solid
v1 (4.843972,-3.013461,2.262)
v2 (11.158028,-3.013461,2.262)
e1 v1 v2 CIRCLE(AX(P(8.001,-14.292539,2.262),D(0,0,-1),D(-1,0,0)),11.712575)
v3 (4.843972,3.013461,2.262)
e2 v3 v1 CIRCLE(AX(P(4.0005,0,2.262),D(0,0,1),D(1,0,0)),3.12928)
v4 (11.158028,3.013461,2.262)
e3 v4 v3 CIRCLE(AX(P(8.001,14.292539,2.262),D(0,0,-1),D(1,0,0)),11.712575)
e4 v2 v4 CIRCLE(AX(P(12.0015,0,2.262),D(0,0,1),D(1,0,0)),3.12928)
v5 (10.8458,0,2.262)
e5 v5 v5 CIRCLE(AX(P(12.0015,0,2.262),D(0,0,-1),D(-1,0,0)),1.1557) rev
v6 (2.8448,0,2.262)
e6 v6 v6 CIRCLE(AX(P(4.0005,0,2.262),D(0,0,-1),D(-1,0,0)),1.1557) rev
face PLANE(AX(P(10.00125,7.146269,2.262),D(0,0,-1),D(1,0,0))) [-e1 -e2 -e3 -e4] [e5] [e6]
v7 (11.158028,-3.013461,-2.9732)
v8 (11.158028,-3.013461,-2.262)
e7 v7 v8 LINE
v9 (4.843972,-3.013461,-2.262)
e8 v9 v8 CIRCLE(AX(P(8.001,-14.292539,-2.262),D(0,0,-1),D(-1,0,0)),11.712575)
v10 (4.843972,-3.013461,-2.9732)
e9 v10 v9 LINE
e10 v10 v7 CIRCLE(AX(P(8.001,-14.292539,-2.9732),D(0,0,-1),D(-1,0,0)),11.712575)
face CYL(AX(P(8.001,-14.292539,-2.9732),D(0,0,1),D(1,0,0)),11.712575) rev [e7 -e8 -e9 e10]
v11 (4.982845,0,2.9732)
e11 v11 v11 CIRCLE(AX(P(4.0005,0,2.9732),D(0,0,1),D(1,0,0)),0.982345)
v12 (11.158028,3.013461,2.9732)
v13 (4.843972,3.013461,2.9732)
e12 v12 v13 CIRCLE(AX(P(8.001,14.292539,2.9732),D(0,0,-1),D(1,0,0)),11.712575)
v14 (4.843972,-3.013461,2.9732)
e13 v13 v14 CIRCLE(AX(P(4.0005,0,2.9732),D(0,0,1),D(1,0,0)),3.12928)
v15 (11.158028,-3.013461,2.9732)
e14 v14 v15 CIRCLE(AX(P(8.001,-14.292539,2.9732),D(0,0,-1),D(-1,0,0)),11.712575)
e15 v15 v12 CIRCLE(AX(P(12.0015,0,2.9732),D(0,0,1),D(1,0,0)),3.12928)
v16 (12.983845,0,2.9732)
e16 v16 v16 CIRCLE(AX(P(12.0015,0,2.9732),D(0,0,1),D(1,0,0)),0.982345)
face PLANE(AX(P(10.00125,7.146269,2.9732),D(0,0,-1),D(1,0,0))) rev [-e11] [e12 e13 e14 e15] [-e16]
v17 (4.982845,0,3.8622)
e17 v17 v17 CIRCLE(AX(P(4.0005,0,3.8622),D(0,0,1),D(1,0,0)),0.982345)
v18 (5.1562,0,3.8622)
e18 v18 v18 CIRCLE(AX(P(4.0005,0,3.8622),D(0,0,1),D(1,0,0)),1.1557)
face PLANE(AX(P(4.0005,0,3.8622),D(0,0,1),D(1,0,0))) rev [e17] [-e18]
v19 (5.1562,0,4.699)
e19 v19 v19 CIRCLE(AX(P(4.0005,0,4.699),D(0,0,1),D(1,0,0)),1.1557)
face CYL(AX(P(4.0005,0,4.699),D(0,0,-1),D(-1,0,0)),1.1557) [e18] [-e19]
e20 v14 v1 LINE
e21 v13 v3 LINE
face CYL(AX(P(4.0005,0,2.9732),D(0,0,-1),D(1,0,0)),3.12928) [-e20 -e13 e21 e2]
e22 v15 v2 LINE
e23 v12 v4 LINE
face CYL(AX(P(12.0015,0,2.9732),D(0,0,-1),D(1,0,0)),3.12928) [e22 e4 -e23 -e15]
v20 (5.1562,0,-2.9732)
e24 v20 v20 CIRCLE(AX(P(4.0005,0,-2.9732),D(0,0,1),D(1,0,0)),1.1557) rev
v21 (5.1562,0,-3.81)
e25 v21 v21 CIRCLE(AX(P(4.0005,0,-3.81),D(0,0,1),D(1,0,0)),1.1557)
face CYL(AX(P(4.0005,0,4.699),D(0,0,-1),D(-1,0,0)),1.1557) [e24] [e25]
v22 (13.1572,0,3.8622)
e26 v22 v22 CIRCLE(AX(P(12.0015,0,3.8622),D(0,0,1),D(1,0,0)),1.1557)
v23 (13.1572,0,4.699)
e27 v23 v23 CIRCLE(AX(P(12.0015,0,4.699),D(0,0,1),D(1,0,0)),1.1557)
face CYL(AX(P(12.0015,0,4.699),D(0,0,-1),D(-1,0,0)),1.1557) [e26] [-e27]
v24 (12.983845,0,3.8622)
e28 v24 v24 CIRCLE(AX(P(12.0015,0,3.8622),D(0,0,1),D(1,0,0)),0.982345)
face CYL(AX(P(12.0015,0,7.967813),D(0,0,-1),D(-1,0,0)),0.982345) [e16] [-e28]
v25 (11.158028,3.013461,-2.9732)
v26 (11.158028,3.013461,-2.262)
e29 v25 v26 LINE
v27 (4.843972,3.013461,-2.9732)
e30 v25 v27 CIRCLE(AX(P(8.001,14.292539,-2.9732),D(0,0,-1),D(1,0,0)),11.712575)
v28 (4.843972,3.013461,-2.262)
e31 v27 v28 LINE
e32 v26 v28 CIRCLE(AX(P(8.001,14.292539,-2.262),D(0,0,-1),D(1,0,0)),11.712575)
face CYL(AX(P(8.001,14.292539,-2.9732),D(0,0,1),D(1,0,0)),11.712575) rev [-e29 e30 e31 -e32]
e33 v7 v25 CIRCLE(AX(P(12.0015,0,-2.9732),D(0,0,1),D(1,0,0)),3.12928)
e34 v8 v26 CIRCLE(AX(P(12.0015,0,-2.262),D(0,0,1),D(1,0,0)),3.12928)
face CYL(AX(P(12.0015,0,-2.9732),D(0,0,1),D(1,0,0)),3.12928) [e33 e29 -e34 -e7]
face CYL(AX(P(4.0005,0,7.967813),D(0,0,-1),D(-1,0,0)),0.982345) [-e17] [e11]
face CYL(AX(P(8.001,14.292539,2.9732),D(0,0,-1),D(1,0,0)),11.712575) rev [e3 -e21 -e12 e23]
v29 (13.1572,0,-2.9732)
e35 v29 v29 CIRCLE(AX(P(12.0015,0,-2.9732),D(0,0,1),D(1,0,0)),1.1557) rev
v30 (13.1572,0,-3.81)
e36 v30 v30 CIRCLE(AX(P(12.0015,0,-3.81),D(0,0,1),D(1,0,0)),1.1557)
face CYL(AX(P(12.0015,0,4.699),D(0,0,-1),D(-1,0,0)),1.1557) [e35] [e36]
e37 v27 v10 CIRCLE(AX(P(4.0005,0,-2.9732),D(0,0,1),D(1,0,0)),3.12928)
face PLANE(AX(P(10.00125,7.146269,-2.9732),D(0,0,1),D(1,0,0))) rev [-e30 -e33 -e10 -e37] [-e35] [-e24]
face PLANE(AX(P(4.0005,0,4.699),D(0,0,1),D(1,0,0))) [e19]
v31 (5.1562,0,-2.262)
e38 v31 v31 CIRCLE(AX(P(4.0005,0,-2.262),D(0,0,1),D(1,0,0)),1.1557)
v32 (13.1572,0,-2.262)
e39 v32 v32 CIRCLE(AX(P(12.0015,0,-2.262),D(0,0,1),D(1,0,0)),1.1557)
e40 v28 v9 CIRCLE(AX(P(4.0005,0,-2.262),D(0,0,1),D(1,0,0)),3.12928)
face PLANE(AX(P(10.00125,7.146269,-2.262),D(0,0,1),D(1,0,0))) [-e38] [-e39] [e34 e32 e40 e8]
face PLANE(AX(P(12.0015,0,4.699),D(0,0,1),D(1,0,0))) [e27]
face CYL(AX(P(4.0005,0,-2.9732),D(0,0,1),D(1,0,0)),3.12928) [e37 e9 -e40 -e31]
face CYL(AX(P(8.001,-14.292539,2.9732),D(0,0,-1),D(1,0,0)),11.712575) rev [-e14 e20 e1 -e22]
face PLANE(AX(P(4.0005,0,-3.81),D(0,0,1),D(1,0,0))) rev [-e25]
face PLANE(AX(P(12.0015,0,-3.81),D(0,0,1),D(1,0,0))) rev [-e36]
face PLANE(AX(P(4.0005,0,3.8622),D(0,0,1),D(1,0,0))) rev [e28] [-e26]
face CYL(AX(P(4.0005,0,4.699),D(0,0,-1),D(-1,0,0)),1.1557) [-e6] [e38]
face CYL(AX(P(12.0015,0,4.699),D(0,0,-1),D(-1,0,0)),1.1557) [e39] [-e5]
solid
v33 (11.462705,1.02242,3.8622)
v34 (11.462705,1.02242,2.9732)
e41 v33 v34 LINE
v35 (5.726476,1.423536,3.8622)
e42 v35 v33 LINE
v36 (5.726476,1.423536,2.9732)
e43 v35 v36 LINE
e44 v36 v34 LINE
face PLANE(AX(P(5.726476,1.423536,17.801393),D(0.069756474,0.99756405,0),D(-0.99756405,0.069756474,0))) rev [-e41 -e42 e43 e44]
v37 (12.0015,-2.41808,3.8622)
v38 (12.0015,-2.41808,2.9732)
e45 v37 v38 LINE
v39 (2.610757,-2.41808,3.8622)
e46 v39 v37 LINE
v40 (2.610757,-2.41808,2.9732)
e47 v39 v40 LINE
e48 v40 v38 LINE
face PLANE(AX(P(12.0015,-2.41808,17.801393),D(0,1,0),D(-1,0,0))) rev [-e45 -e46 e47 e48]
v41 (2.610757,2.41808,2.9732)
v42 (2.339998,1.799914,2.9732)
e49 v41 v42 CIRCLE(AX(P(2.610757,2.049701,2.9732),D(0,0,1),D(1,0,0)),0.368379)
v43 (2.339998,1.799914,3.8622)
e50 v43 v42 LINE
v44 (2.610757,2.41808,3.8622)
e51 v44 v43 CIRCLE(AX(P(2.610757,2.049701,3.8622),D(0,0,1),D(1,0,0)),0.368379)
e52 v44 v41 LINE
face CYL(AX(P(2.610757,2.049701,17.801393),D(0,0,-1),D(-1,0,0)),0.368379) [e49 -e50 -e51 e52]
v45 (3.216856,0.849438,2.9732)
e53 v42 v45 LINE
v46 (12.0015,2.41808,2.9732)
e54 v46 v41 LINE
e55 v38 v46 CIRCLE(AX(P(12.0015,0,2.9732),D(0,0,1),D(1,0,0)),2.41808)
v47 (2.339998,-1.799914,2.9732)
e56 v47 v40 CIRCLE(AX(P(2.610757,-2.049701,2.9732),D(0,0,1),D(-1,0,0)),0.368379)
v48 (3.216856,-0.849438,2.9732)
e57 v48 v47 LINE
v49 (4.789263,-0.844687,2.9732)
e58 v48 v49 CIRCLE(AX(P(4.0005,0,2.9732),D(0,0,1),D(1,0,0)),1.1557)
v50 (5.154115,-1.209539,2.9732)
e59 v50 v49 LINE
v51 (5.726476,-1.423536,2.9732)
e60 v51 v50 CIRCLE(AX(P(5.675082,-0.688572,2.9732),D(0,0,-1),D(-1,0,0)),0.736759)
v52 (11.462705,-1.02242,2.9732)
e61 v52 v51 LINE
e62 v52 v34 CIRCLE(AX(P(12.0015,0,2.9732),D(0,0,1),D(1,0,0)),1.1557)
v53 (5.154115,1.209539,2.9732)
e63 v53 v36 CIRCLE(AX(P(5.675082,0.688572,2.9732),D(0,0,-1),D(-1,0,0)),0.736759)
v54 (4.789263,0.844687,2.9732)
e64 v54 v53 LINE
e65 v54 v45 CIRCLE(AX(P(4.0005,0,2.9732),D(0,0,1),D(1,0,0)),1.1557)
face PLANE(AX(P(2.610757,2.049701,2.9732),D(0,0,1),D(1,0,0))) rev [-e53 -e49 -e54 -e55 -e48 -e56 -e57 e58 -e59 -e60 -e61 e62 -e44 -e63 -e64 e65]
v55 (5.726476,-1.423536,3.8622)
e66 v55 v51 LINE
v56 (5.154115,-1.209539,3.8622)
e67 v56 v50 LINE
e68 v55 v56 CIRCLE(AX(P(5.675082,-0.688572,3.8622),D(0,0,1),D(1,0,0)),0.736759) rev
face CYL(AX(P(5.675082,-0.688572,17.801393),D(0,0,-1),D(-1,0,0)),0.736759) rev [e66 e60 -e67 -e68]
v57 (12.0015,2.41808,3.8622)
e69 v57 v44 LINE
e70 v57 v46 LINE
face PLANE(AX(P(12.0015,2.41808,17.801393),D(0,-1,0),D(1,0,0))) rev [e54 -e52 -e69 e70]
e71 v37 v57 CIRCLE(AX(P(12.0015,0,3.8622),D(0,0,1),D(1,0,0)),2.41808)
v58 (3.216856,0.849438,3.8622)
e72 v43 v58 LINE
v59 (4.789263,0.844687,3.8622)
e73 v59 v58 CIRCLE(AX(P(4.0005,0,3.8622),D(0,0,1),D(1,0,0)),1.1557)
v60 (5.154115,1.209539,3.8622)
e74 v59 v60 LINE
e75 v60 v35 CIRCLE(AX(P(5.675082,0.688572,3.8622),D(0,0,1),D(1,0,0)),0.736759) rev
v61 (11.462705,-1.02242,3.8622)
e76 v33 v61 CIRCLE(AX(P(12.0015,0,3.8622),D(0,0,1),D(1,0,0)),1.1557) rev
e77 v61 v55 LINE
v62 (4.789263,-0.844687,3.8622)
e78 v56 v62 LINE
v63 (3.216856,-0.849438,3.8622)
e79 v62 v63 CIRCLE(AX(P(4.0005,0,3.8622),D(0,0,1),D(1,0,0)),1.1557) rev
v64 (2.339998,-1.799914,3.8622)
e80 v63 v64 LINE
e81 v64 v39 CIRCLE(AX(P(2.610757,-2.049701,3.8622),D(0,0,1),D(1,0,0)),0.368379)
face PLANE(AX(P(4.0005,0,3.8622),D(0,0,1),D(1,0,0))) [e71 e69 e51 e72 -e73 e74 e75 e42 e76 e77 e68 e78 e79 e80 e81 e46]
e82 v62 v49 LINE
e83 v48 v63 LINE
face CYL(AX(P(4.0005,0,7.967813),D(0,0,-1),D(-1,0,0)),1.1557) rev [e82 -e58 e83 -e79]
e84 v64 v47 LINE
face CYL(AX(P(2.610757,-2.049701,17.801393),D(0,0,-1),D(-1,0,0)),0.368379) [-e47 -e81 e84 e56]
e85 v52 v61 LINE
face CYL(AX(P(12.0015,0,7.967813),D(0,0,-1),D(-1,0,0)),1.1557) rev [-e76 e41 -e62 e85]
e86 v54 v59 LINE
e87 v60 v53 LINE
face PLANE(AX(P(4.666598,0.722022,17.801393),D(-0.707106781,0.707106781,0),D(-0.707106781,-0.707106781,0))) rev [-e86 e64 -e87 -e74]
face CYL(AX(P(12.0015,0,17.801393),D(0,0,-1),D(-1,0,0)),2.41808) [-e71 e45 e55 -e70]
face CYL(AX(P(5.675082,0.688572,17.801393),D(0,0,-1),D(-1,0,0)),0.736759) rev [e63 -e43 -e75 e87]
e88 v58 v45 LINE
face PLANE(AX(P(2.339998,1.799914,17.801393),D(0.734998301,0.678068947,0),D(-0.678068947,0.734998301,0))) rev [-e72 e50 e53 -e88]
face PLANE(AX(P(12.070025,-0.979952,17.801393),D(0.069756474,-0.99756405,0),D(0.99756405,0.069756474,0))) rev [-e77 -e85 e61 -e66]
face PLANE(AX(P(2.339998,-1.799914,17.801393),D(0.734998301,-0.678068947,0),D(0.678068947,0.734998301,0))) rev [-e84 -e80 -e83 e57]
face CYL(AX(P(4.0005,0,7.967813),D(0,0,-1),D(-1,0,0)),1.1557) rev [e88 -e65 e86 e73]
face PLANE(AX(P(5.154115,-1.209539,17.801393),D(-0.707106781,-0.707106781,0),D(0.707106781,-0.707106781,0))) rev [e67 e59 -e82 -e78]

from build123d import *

# Parameters (mm, degrees)
SKETCH4_R                  = 2.5
SKETCH4_R_2                = 1.1811
BOSS_EXTRUDE1_DEPTH        = 1.5
SKETCH5_R                  = 1.1557
BOSS_EXTRUDE2_DEPTH        = 0.7112
LPATTERN1_COUNT            = 2
LPATTERN1_PITCH            = 8.001
SKETCH7_R                  = 1.1557
BOSS_EXTRUDE3_DEPTH        = 0.7112
MIRROR1_START              = 2.262
MIRROR1_OUTLINE_R          = 1.1557
MIRROR1_DEPTH              = 0.7112
BOSS_EXTRUDE4_DEPTH        = 4.699
BOSS_EXTRUDE4_DEPTH_BACK   = 3.81
SKETCH8_R                  = 1.1557
BOSS_EXTRUDE4_2_DEPTH      = 4.699
BOSS_EXTRUDE4_2_DEPTH_BACK = 3.81
BOSS_EXTRUDE5_DEPTH        = 0.889
SKETCH12_R                 = 1.1557
SKETCH12_R_2               = 0.982345
CUT_EXTRUDE1_DEPTH         = 0.889


# Read off the part's stored shape, not the designer's step: Mirror1
with BuildPart() as part:
    # Sketch4 → Boss-Extrude1 (new, symmetric)
    with BuildSketch(Plane.XY):
        with Locations((4.0005, 0)):
            Circle(SKETCH4_R)
        with Locations((4.0005, 0)):
            Circle(SKETCH4_R_2, mode=Mode.SUBTRACT)
    extrude(amount=BOSS_EXTRUDE1_DEPTH, both=True)


with BuildPart() as body_2:
    # Sketch5 → Boss-Extrude2 (new body)
    with BuildSketch(Plane.XY.offset(1.5)):
        with BuildLine():
            ThreePointArc((-3.068796943, 3.431772926), (-7.5565, 0), (-3.068796943, -3.431772926))
            ThreePointArc((-3.068796943, -3.431772926), (0, -3.0226), (3.068796943, -3.431772926))
            ThreePointArc((3.068796943, -3.431772926), (7.5565, 0), (3.068796943, 3.431772926))
            ThreePointArc((3.068796943, 3.431772926), (0, 3.0226), (-3.068796943, 3.431772926))
        make_face()
        with Locations((-4.0005, 0)):
            Circle(SKETCH5_R, mode=Mode.SUBTRACT)
        with Locations((4.0005, 0)):
            Circle(SKETCH5_R, mode=Mode.SUBTRACT)
    extrude(amount=BOSS_EXTRUDE2_DEPTH)


with BuildPart() as lpattern1_1:
    # LPattern1: pattern copy
    add(part.part.moved(Location(Vector(1, 0, 0) * (1 * LPATTERN1_PITCH))))


with BuildPart() as body_4:
    # Sketch7 → Boss-Extrude3 (new body)
    with BuildSketch(Plane.XY.offset(-2.262)):
        with BuildLine():
            ThreePointArc((4.843971698, 3.013461268), (0.87122, 0), (4.843971698, -3.013461268))
            ThreePointArc((4.843971698, -3.013461268), (8.001, -2.579963599), (11.158028302, -3.013461268))
            ThreePointArc((11.158028302, -3.013461268), (15.13078, 0), (11.158028302, 3.013461268))
            ThreePointArc((11.158028302, 3.013461268), (8.001, 2.579963599), (4.843971698, 3.013461268))
        make_face()
        with Locations((4.0005, 0)):
            Circle(SKETCH7_R, mode=Mode.SUBTRACT)
        with Locations((12.0015, 0)):
            Circle(SKETCH7_R, mode=Mode.SUBTRACT)
    extrude(amount=-BOSS_EXTRUDE3_DEPTH)


with BuildPart() as body_5:
    # Mirror1 outline → Mirror1 (new body)
    with BuildSketch(Plane.XY.offset(MIRROR1_START)):
        with BuildLine():
            ThreePointArc((11.158028302, -3.013461268), (15.13078, 0), (11.158028302, 3.013461268))
            ThreePointArc((11.158028302, 3.013461268), (8.001, 2.579963599), (4.843971698, 3.013461268))
            ThreePointArc((4.843971698, 3.013461268), (0.87122, 0), (4.843971698, -3.013461268))
            ThreePointArc((4.843971698, -3.013461268), (8.001, -2.579963599), (11.158028302, -3.013461268))
        make_face()
        with Locations((4.0005, 0)):
            Circle(MIRROR1_OUTLINE_R, mode=Mode.SUBTRACT)
        with Locations((12.0015, 0)):
            Circle(MIRROR1_OUTLINE_R, mode=Mode.SUBTRACT)
    extrude(amount=MIRROR1_DEPTH)


with BuildPart() as body_3:
    # Sketch8 → Boss-Extrude4 (new, two sides: drawn at the far end of the back side and taken through both)
    with BuildSketch(Plane.XY.offset(-BOSS_EXTRUDE4_DEPTH_BACK)):
        with Locations((4.0005, 0)):
            Circle(SKETCH8_R)
    extrude(amount=BOSS_EXTRUDE4_DEPTH + BOSS_EXTRUDE4_DEPTH_BACK)


with BuildPart() as body_4_2:
    # Sketch8 → Boss-Extrude4 2 (new, two sides: drawn at the far end of the back side and taken through both)
    with BuildSketch(Plane.XY.offset(-BOSS_EXTRUDE4_2_DEPTH_BACK)):
        with Locations((12.0015, 0)):
            Circle(SKETCH8_R)
    extrude(amount=BOSS_EXTRUDE4_2_DEPTH + BOSS_EXTRUDE4_2_DEPTH_BACK)


with BuildPart() as body_5_2:
    # Sketch10 → Boss-Extrude5 (new body)
    with BuildSketch(Plane.XY.offset(2.9732)):
        with BuildLine():
            Line((12.0015, -2.41808), (2.610756693, -2.41808))
            ThreePointArc((2.610756693, -2.41808), (2.273325514, -2.197496306), (2.339998478, -1.79991401))
            Line((2.339998478, -1.79991401), (3.33440236, -0.722021906))
            ThreePointArc((3.33440236, -0.722021906), (4.0005, -0.982345), (4.66659764, -0.722021906))
            Line((4.66659764, -0.722021906), (5.154115021, -1.209539288))
            ThreePointArc((5.154115021, -1.209539288), (5.417063777, -1.378673611), (5.726475822, -1.423536222))
            Line((5.726475822, -1.423536222), (12.070024923, -0.979952057))
            ThreePointArc((12.070024923, -0.979952057), (12.983845, 0), (12.070024923, 0.979952057))
            Line((12.070024923, 0.979952057), (5.726475822, 1.423536222))
            ThreePointArc((5.726475822, 1.423536222), (5.417063777, 1.378673611), (5.154115021, 1.209539288))
            Line((5.154115021, 1.209539288), (4.66659764, 0.722021906))
            ThreePointArc((4.66659764, 0.722021906), (4.0005, 0.982345), (3.33440236, 0.722021906))
            Line((3.33440236, 0.722021906), (2.339998478, 1.79991401))
            ThreePointArc((2.339998478, 1.79991401), (2.273325514, 2.197496306), (2.610756693, 2.41808))
            Line((2.610756693, 2.41808), (12.0015, 2.41808))
            ThreePointArc((12.0015, 2.41808), (14.41958, 0), (12.0015, -2.41808))
        make_face()
    extrude(amount=BOSS_EXTRUDE5_DEPTH)


with BuildPart() as cut_extrude1_tool:
    # Sketch12 → Cut-Extrude1 (new body)
    # profile 1 of 2: a face of its own
    with BuildSketch(Plane.XY.offset(2.9732)):
        with Locations((4.0005, 0)):
            Circle(SKETCH12_R)
        with Locations((4.0005, 0)):
            Circle(SKETCH12_R_2, mode=Mode.SUBTRACT)
    # profile 2 of 2: a face of its own
    with BuildSketch(Plane.XY.offset(2.9732)):
        with Locations((12.0015, 0)):
            Circle(SKETCH12_R)
        with Locations((12.0015, 0)):
            Circle(SKETCH12_R_2, mode=Mode.SUBTRACT)
    extrude(amount=CUT_EXTRUDE1_DEPTH)


with BuildPart() as body_3_1:
    add(body_3.part)

    # Cut-Extrude1: cut by cut_extrude1_tool
    add(cut_extrude1_tool.part, mode=Mode.SUBTRACT)


with BuildPart() as body_4_2_1:
    add(body_4_2.part)

    # Cut-Extrude1: cut by cut_extrude1_tool
    add(cut_extrude1_tool.part, mode=Mode.SUBTRACT)


with BuildPart() as body_5_2_1:
    add(body_5_2.part)

    # Cut-Extrude1: cut by cut_extrude1_tool
    add(cut_extrude1_tool.part, mode=Mode.SUBTRACT)


with BuildPart() as body_4_1:
    add(body_4.part)

    # Combine3: union body 5, body 4 2, body 3
    add(body_5.part)
    add(body_4_2_1.part)
    add(body_3_1.part)


solid = Compound([body_5_2_1.part, body_4_1.part])
